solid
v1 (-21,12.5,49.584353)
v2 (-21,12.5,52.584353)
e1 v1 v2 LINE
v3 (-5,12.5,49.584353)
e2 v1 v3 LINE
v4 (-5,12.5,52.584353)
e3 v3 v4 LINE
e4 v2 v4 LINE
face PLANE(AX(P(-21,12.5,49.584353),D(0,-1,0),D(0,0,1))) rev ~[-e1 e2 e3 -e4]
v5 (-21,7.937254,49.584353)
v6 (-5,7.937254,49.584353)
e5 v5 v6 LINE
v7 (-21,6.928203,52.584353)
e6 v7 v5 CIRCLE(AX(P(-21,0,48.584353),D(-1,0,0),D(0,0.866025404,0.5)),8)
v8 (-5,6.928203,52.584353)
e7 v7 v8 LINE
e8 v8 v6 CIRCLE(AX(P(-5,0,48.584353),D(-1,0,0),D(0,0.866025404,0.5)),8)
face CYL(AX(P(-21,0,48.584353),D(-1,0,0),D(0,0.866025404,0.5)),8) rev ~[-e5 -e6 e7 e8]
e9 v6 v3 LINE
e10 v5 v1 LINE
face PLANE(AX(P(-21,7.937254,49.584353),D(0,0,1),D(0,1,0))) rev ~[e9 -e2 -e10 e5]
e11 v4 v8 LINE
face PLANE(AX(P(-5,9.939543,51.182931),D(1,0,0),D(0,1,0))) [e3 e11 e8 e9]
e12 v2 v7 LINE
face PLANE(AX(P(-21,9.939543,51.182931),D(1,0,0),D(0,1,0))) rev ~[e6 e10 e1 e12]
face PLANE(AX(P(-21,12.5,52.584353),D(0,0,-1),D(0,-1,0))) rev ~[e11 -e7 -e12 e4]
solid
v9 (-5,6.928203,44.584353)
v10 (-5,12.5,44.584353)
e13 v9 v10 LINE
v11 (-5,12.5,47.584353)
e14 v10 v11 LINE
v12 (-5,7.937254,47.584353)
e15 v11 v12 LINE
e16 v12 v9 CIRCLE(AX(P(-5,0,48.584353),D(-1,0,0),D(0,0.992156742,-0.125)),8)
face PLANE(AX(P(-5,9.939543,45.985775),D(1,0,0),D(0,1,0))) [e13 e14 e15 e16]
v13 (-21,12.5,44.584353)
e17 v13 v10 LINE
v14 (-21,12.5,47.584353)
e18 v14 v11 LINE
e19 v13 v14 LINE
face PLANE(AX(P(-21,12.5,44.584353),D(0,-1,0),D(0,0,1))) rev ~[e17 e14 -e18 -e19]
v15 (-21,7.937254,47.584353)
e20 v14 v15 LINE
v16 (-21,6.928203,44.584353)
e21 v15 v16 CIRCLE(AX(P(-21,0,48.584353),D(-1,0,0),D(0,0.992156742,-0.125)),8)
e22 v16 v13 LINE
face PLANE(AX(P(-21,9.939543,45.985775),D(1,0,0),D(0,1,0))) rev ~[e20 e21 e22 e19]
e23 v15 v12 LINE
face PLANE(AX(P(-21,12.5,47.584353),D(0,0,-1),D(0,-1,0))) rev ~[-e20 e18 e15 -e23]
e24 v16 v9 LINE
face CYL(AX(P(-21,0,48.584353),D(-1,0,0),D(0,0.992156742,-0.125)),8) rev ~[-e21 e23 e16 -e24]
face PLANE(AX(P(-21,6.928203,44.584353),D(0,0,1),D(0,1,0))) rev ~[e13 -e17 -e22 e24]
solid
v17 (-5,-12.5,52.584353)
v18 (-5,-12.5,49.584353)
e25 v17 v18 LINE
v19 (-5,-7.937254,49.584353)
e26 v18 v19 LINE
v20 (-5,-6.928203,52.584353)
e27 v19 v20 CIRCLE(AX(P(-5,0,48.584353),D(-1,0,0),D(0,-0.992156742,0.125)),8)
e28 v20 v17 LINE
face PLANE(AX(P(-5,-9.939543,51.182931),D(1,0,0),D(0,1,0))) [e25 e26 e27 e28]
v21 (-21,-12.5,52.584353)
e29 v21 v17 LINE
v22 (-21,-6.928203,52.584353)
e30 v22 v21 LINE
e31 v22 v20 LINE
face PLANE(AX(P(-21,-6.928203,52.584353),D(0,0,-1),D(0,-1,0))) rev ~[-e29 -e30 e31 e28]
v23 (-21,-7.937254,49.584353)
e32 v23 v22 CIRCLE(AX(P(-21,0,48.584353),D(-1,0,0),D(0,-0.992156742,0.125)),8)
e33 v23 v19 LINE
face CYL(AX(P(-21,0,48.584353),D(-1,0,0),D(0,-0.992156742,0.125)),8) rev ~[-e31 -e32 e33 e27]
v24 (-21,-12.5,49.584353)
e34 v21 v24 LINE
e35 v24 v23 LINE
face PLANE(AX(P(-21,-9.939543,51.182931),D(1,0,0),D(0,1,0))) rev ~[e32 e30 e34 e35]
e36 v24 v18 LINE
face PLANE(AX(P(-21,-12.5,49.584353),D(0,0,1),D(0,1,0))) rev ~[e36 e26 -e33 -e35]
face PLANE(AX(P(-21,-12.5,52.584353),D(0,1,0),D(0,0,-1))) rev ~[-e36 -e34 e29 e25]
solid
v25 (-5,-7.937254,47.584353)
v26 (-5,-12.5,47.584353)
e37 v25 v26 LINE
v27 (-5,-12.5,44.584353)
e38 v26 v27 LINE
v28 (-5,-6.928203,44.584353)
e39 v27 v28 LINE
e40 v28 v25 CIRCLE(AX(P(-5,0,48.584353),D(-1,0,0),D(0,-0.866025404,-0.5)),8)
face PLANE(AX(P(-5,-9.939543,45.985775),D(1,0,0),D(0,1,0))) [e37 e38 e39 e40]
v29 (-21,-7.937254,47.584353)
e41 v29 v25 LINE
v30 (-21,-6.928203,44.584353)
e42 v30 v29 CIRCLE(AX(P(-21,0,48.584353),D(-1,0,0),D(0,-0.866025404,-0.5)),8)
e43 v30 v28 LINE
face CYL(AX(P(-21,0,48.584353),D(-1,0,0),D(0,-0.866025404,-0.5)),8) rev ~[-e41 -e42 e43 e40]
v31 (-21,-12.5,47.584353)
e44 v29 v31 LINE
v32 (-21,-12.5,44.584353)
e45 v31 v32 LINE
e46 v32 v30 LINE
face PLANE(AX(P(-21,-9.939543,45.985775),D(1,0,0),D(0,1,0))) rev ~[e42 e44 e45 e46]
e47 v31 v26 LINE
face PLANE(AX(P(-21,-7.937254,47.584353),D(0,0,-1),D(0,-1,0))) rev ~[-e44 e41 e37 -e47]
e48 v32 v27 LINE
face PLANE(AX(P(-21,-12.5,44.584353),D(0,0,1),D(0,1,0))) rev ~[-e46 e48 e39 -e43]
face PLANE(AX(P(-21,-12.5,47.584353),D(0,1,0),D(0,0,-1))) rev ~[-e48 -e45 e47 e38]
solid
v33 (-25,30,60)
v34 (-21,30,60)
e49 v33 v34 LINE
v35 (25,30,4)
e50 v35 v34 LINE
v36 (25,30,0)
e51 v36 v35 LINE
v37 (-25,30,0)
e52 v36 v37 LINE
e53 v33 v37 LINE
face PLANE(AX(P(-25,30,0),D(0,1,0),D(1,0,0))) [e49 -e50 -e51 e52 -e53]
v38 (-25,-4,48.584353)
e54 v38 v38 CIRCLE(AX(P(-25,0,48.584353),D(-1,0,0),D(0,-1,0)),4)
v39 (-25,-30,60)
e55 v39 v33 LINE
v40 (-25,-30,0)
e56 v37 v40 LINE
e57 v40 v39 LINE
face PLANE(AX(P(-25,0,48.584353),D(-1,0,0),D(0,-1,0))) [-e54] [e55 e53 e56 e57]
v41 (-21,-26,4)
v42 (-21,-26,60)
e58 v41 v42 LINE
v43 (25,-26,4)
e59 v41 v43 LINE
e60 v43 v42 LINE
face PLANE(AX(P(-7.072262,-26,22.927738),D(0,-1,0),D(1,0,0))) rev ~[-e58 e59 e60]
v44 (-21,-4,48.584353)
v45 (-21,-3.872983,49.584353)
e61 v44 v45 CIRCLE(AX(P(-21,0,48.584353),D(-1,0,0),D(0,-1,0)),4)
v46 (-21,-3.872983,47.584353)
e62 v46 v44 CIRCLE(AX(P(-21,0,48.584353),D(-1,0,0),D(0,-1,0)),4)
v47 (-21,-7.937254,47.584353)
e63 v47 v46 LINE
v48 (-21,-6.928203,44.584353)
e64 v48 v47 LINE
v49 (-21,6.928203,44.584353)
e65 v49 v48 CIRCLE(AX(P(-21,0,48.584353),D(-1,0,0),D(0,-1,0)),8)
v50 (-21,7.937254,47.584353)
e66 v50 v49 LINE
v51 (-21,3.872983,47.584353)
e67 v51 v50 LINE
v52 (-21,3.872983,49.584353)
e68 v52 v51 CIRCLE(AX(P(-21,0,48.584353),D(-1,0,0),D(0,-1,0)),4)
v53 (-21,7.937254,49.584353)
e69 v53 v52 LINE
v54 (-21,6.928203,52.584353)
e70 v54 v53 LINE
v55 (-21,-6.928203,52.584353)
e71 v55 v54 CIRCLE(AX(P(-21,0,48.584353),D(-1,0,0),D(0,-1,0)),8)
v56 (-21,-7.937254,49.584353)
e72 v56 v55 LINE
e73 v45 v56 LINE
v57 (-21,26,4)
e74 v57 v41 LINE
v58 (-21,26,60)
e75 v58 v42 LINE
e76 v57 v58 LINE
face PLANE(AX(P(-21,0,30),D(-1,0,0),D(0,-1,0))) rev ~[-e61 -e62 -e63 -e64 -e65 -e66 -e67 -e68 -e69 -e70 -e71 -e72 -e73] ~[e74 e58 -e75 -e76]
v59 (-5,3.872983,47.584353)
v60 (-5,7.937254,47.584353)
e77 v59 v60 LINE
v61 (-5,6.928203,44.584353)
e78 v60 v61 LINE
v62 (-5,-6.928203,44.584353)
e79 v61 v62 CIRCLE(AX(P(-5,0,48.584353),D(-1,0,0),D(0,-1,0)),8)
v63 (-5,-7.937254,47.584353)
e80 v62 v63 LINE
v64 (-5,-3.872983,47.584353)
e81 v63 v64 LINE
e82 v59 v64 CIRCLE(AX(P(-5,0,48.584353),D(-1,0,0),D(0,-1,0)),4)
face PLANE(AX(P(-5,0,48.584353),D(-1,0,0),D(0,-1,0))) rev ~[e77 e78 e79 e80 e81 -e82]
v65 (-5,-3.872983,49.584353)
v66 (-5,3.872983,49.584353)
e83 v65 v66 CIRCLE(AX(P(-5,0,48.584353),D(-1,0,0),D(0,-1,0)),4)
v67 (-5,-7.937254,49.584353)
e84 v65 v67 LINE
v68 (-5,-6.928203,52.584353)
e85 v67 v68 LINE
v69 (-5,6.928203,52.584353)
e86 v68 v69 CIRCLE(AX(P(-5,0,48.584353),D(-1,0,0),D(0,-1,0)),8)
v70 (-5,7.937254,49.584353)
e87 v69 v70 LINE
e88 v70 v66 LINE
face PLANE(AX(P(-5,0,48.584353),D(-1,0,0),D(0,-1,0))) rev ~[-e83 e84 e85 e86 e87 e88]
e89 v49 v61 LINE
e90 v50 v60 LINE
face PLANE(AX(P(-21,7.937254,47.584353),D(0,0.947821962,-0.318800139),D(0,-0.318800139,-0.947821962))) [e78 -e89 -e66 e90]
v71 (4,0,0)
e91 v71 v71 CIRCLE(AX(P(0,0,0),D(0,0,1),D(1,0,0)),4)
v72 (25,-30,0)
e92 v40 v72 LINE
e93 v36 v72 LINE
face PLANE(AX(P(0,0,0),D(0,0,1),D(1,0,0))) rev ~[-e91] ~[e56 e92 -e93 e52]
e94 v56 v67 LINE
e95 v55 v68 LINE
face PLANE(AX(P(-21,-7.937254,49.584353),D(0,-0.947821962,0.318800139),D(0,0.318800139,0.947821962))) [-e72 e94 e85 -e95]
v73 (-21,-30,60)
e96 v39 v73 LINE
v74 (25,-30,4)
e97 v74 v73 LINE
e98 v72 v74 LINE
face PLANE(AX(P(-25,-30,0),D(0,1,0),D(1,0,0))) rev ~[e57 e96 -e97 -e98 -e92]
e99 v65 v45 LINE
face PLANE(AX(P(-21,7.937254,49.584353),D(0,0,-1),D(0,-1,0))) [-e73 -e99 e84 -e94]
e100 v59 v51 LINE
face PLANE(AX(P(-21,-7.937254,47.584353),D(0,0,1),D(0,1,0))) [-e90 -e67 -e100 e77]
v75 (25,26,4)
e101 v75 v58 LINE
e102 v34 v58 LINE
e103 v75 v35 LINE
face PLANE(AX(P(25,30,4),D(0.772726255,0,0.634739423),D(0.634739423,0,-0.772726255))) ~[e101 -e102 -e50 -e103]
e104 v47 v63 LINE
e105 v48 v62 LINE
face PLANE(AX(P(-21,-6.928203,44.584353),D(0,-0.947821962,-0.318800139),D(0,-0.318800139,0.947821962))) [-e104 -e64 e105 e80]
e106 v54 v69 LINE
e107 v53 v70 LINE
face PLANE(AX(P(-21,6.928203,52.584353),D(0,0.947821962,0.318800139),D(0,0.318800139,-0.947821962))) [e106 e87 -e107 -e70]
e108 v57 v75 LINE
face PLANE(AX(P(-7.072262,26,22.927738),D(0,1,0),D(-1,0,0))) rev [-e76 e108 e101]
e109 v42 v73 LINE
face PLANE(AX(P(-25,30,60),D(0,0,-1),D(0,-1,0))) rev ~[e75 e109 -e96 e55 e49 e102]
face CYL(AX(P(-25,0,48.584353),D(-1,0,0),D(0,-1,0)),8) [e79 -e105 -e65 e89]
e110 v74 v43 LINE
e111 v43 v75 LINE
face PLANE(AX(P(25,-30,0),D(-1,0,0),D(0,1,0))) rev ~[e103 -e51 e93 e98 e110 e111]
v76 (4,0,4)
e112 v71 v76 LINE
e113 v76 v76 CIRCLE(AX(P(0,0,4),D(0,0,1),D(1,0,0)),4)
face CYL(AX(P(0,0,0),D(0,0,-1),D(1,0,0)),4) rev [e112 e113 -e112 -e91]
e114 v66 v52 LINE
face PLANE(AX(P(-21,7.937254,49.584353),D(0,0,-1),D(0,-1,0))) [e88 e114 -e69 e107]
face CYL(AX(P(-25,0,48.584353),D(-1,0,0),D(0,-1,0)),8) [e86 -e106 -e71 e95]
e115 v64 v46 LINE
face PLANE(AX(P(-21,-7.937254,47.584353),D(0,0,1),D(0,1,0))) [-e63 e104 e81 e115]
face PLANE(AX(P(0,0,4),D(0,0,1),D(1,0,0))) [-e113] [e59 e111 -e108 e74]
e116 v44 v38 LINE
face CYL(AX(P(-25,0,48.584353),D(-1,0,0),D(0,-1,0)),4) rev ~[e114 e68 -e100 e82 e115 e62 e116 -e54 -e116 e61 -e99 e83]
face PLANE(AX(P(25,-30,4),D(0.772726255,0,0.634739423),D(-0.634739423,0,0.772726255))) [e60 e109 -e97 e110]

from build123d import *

# Parameters (mm, degrees)
F0_W      = 50
F0_H      = 60
F0_R      = 4
F1_DEPTH  = 4
F2_W      = 60
F2_H      = 60
F3_DEPTH  = 4
F5_DEPTH  = 4
F6_R      = 8
F6_R_2    = 4
F7_DEPTH  = 20
F8_DEPTH  = 50.001
F10_DEPTH = 46.001
F11_DEPTH = 16


# Not quite as in the source:
# - a pattern or mirror of a feature is missing from the dataset's text; its kind, count and spacing are read off the source's solid


with BuildPart() as f1:
    # F0 (on Top) → F1 (new body)
    with BuildSketch(Plane.XY):
        Rectangle(F0_W, F0_H)
        Circle(F0_R, mode=Mode.SUBTRACT)
    extrude(amount=F1_DEPTH)

    # F2 (on face) → F3 (join)
    with BuildSketch(Plane(origin=(-25, 0, 0), x_dir=(0, -1, 0), z_dir=(-1, 0, 0))):
        with Locations((0, 30)):
            Rectangle(F2_W, F2_H)
    extrude(amount=-F3_DEPTH)

    # F4 (on face) → F5 (join)
    with BuildSketch(Plane.XZ.offset(30)):
        Polygon((-21, 60), (-25, 60), (-25, 0), (25, 0), (25, 4), align=None)
    f5 = extrude(amount=-F5_DEPTH)

    # F5_copies: F5 across plane
    add(f5.mirror(Plane.ZX))

    # F6 (on face) → F7 (join)
    with BuildSketch(Plane(origin=(-25, 0, 0), x_dir=(0, -1, 0), z_dir=(-1, 0, 0))):
        with Locations((0, 48.5843531787)):
            Circle(F6_R)
        with Locations((0, 48.5843531787)):
            Circle(F6_R_2, mode=Mode.SUBTRACT)
    extrude(amount=-F7_DEPTH)

    # F6 (on face) → F8 (cut, through all)
    with BuildSketch(Plane(origin=(-25, 0, 0), x_dir=(0, -1, 0), z_dir=(-1, 0, 0))):
        with Locations((0, 48.5843531787)):
            Circle(F6_R_2)
    extrude(amount=-F8_DEPTH, mode=Mode.SUBTRACT)

    # F9 (on face) → F10 (cut, through all)
    with BuildSketch(Plane.YZ.offset(-21)):
        Polygon((12.5, 44.5843531787), (12.5, 47.5843531787), (7.9372539332, 47.5843531787), (6.9282032303, 44.5843531787), align=None)
        Polygon((7.9372539332, 47.5843531787), (12.5, 47.5843531787), (12.5, 49.5843531787), (7.9372539332, 49.5843531787), (-7.9372539332, 49.5843531787), (-12.5, 49.5843531787), (-12.5, 47.5843531787), (-7.9372539332, 47.5843531787), align=None)
        Polygon((7.9372539332, 49.5843531787), (12.5, 49.5843531787), (12.5, 52.5843531787), (6.9282032303, 52.5843531787), align=None)
        Polygon((-6.9282032303, 44.5843531787), (-7.9372539332, 47.5843531787), (-12.5, 47.5843531787), (-12.5, 44.5843531787), align=None)
        Polygon((-12.5, 49.5843531787), (-7.9372539332, 49.5843531787), (-6.9282032303, 52.5843531787), (-12.5, 52.5843531787), align=None)
    extrude(amount=F10_DEPTH, mode=Mode.SUBTRACT)


with BuildPart() as f11:
    # F9 (on face) → F11 (new body)
    with BuildSketch(Plane.YZ.offset(-21)):
        with BuildLine():
            Line((-12.5, 49.5843531787), (-7.9372539332, 49.5843531787))
            ThreePointArc((-7.9372539332, 49.5843531787), (-7.582575695, 51.1347542904), (-6.9282032303, 52.5843531787))
            Line((-6.9282032303, 52.5843531787), (-12.5, 52.5843531787))
            Line((-12.5, 52.5843531787), (-12.5, 49.5843531787))
        make_face()
    extrude(amount=F11_DEPTH)


with BuildPart() as f11b:
    # F9 (on face) → F11, piece 2 (new body)
    with BuildSketch(Plane.YZ.offset(-21)):
        with BuildLine():
            ThreePointArc((-6.9282032303, 44.5843531787), (-7.582575695, 46.0339520671), (-7.9372539332, 47.5843531787))
            Line((-7.9372539332, 47.5843531787), (-12.5, 47.5843531787))
            Line((-12.5, 47.5843531787), (-12.5, 44.5843531787))
            Line((-12.5, 44.5843531787), (-6.9282032303, 44.5843531787))
        make_face()
    extrude(amount=F11_DEPTH)


with BuildPart() as f11c:
    # F9 (on face) → F11, piece 3 (new body)
    with BuildSketch(Plane.YZ.offset(-21)):
        with BuildLine():
            Line((7.9372539332, 49.5843531787), (12.5, 49.5843531787))
            Line((12.5, 49.5843531787), (12.5, 52.5843531787))
            Line((12.5, 52.5843531787), (6.9282032303, 52.5843531787))
            ThreePointArc((6.9282032303, 52.5843531787), (7.582575695, 51.1347542904), (7.9372539332, 49.5843531787))
        make_face()
    extrude(amount=F11_DEPTH)


with BuildPart() as f11d:
    # F9 (on face) → F11, piece 4 (new body)
    with BuildSketch(Plane.YZ.offset(-21)):
        with BuildLine():
            Line((12.5, 44.5843531787), (12.5, 47.5843531787))
            Line((12.5, 47.5843531787), (7.9372539332, 47.5843531787))
            ThreePointArc((7.9372539332, 47.5843531787), (7.582575695, 46.0339520671), (6.9282032303, 44.5843531787))
            Line((6.9282032303, 44.5843531787), (12.5, 44.5843531787))
        make_face()
    extrude(amount=F11_DEPTH)


solid = Compound([f1.part, f11.part, f11b.part, f11c.part, f11d.part])
